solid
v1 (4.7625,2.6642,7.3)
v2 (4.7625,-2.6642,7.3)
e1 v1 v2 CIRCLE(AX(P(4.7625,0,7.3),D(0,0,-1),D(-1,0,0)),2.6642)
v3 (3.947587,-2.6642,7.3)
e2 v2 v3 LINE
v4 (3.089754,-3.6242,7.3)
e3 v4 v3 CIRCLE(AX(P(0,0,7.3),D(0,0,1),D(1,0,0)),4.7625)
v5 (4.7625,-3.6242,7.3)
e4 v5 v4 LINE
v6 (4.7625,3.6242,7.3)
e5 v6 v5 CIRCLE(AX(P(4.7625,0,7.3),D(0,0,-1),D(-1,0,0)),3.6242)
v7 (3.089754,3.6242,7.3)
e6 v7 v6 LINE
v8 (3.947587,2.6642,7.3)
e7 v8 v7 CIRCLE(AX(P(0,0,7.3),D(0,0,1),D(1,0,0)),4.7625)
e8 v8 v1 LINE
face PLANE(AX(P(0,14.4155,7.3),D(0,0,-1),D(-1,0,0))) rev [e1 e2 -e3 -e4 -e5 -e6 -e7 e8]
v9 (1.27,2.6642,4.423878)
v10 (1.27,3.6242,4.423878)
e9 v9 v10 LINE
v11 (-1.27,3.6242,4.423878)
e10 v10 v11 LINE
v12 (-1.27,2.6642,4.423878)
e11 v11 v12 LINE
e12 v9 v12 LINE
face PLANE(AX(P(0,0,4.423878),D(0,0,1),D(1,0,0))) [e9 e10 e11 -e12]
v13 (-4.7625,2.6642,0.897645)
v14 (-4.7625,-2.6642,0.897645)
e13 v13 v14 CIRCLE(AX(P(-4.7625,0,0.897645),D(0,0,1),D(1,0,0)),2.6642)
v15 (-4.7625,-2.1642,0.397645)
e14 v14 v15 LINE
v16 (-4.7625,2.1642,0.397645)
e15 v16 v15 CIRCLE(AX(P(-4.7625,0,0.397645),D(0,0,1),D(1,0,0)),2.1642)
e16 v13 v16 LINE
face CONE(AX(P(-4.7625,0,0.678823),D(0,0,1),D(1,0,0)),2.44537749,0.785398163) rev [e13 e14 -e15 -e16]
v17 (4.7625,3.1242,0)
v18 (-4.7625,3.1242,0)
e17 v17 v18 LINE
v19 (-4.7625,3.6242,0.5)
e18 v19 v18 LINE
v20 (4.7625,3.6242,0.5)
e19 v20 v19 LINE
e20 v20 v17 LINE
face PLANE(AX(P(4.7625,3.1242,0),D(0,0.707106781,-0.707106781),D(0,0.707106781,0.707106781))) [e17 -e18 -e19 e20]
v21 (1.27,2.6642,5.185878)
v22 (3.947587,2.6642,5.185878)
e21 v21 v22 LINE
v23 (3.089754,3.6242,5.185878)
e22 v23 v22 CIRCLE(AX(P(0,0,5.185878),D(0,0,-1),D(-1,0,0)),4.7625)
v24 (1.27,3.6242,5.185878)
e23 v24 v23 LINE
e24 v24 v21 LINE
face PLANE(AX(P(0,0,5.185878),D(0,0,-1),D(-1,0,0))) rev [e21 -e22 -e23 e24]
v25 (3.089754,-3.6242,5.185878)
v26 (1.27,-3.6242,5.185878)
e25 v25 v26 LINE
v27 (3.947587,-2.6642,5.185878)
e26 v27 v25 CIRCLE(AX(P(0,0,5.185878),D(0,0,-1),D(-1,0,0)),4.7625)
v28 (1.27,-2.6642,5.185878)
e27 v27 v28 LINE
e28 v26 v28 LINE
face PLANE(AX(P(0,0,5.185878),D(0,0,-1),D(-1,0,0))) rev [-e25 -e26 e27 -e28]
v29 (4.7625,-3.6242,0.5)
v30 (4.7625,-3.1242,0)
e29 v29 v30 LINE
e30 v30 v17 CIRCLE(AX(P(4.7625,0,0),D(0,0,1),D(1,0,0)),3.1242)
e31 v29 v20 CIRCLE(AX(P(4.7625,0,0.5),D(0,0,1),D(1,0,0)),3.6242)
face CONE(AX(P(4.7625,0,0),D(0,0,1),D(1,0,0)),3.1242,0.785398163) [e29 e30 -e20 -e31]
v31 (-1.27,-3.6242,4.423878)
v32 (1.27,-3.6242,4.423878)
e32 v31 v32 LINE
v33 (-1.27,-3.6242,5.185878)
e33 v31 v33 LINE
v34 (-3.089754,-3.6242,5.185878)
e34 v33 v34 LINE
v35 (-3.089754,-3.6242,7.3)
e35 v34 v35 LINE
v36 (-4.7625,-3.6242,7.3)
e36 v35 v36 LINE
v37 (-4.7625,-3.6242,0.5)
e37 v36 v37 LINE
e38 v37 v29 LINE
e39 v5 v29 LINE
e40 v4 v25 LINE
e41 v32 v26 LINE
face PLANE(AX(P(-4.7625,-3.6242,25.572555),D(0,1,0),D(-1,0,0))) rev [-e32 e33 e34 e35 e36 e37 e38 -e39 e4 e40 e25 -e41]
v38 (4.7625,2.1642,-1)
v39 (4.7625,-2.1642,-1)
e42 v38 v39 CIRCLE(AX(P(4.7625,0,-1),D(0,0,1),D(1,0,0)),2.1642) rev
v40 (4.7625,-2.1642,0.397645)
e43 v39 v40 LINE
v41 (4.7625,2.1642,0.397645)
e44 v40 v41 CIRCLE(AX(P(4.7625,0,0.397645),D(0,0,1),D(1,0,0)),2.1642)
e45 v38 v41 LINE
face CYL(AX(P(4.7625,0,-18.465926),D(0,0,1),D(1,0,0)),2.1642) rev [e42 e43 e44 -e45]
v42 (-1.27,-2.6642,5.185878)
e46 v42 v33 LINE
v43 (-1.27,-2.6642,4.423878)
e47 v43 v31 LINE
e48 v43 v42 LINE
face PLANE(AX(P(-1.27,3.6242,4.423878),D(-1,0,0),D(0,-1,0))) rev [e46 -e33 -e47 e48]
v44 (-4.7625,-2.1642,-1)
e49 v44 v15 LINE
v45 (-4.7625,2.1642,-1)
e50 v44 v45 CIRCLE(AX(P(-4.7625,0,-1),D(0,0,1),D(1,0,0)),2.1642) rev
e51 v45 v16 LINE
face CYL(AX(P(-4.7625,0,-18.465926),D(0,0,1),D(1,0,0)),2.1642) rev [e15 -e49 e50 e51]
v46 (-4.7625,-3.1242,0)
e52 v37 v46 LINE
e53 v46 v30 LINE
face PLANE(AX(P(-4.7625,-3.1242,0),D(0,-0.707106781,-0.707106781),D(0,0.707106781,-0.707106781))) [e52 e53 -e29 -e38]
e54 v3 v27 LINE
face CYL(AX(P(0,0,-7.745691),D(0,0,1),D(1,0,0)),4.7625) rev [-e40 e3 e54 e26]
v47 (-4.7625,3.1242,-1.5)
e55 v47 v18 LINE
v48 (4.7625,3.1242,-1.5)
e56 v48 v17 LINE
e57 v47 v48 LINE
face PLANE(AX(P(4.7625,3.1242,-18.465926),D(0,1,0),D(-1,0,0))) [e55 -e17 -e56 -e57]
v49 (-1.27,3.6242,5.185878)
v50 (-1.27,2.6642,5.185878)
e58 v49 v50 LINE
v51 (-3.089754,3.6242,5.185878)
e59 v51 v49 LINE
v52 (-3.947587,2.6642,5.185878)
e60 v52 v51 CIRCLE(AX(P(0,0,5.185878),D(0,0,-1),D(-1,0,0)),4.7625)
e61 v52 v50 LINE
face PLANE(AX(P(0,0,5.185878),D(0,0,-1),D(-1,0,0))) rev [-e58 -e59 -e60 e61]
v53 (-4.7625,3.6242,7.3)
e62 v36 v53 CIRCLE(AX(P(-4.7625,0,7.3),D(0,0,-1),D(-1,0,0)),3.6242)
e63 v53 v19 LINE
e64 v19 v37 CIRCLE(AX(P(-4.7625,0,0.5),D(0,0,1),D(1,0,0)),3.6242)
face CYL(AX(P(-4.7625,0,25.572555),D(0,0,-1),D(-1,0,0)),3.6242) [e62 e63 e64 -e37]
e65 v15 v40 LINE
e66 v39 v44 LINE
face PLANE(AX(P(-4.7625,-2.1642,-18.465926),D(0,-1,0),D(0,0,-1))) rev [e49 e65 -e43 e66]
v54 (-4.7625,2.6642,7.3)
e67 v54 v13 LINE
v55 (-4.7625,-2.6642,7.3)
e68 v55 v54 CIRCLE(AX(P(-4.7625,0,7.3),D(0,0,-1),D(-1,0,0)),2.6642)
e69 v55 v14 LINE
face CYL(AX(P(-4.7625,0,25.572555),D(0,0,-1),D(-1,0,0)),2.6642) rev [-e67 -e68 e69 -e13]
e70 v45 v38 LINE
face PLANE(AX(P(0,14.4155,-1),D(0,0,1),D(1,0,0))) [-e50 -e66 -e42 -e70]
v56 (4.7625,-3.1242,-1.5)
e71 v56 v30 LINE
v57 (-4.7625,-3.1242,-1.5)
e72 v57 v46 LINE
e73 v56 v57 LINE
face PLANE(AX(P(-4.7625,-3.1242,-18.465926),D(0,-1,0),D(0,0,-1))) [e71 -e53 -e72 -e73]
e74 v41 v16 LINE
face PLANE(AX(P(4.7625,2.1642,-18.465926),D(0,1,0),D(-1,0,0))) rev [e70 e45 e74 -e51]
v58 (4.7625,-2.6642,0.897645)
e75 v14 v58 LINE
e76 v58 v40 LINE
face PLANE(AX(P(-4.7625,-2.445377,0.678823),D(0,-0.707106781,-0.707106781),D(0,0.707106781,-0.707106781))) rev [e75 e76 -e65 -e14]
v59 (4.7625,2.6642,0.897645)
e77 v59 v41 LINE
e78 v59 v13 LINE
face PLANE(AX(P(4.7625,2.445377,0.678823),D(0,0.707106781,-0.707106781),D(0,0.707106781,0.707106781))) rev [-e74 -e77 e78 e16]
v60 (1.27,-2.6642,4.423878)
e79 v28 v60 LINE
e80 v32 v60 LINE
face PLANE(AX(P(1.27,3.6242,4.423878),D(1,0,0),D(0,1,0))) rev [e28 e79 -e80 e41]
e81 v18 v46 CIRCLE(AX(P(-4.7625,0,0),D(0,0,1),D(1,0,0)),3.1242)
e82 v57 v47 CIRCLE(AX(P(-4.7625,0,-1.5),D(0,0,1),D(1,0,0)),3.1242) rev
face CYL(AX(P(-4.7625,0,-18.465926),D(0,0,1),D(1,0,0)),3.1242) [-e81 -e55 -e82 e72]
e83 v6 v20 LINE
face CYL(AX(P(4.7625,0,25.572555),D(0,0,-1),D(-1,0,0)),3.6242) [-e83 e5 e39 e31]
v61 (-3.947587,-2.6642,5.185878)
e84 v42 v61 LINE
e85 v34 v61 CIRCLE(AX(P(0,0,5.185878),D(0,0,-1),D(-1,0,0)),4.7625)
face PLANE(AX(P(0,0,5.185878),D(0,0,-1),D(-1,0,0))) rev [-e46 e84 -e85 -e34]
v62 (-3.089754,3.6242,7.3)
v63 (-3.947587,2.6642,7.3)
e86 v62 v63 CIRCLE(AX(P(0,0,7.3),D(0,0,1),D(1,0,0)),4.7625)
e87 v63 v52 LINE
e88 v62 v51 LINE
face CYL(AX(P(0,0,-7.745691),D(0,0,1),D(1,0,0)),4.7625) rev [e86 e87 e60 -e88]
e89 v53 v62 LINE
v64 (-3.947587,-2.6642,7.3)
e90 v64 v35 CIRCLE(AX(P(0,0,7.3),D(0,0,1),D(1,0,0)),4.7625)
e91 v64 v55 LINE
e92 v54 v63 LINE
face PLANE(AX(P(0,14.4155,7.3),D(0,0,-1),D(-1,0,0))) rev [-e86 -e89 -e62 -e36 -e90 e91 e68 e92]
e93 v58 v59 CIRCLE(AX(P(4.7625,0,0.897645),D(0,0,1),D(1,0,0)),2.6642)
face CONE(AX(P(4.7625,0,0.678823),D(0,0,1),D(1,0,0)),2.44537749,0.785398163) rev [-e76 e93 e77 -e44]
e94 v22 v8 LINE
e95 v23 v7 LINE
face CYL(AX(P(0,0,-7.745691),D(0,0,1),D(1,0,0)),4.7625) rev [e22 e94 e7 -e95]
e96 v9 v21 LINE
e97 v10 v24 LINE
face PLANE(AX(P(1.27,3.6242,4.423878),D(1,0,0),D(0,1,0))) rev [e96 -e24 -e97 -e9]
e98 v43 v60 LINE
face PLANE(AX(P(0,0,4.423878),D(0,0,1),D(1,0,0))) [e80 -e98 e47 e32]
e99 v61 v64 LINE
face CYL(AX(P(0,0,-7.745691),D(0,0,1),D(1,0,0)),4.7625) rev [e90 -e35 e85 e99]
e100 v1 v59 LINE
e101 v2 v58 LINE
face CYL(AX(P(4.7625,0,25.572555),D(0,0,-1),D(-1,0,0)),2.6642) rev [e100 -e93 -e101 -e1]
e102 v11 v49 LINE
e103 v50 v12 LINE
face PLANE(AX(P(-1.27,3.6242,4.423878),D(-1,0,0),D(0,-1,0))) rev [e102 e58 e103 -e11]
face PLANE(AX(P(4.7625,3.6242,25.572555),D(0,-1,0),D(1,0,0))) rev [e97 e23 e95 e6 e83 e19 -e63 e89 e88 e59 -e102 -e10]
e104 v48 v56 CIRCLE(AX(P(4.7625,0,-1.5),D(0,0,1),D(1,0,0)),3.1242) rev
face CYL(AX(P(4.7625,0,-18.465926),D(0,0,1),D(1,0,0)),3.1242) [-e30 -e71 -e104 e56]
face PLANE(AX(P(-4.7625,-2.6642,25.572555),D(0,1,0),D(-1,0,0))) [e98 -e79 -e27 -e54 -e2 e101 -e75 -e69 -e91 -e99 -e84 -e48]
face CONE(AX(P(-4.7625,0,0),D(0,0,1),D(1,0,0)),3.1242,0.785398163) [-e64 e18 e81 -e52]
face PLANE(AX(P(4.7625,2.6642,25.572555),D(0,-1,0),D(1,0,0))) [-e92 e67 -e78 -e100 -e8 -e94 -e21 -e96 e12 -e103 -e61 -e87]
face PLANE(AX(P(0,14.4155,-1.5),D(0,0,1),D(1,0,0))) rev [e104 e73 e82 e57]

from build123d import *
from OCP.BRepAlgoAPI import BRepAlgoAPI_Cut
from OCP.TopTools import TopTools_ListOfShape

# Parameters (mm, degrees)
BOSS_EXTRUDE1_DEPTH      = 1.5
BOSS_EXTRUDE3_DEPTH      = 0.5
BOSS_EXTRUDE3_DRAFT      = -45
BOSS_EXTRUDE4_DEPTH      = 6.8
SHELL1_T                 = -0.96
SHELL1_THICKNESS_2_DEPTH = 0.46
CUT_EXTRUDE1_START       = -2.114122
CUT_EXTRUDE1_DEPTH       = 2.114122
SKETCH5_W                = 2.54
SKETCH5_H                = 7.2484
CUT_EXTRUDE2_DEPTH       = 0.762


with BuildPart() as part:
    # Sketch2 → Boss-Extrude1 (new body)
    with BuildSketch(Plane.XY):
        with BuildLine():
            Line((-4.7625, -3.1242), (4.7625, -3.1242))
            ThreePointArc((4.7625, -3.1242), (7.8867, 0), (4.7625, 3.1242))
            Line((4.7625, 3.1242), (-4.7625, 3.1242))
            ThreePointArc((-4.7625, 3.1242), (-7.8867, 0), (-4.7625, -3.1242))
        make_face()
    extrude(amount=-BOSS_EXTRUDE1_DEPTH)


with BuildPart() as boss_extrude3_tool:
    # Sketch2<3> → Boss-Extrude3 (with draft: the straight prism first)
    with BuildSketch(Plane.XY):
        with BuildLine():
            Line((-4.7625, -3.1242), (4.7625, -3.1242))
            ThreePointArc((4.7625, -3.1242), (7.8867, 0), (4.7625, 3.1242))
            Line((4.7625, 3.1242), (-4.7625, 3.1242))
            ThreePointArc((-4.7625, 3.1242), (-7.8867, 0), (-4.7625, -3.1242))
        make_face()
    extrude(amount=BOSS_EXTRUDE3_DEPTH)
    # Boss-Extrude3: the draft: its side faces are tilted about the plane it starts from
    boss_extrude3_sides = [boss_extrude3_tool.faces().sort_by_distance(p)[0] for p in [
        (0, -3.1242, 0.25),
        (7.8867, 0, 0.25),
        (0, 3.1242, 0.25),
        (-7.8867, 0, 0.25),
    ]]
    draft(boss_extrude3_sides, Plane.XY, BOSS_EXTRUDE3_DRAFT)


with BuildPart() as part_1:
    add(part.part)

    # Boss-Extrude3: add boss_extrude3_tool
    add(boss_extrude3_tool.part)

    # Sketch3 → Boss-Extrude4 (add)
    with BuildSketch(Plane.XY.offset(0.5)):
        with BuildLine():
            Line((-4.7625, -3.6242), (4.7625, -3.6242))
            ThreePointArc((4.7625, -3.6242), (8.3867, 0), (4.7625, 3.6242))
            Line((4.7625, 3.6242), (-4.7625, 3.6242))
            ThreePointArc((-4.7625, 3.6242), (-8.3867, 0), (-4.7625, -3.6242))
        make_face()
    extrude(amount=BOSS_EXTRUDE4_DEPTH)

    # Shell1
    shell1_openings = [part_1.faces().sort_by_distance(p)[0] for p in [
        (0, 0, 7.3),
    ]]
    offset(amount=SHELL1_T, openings=shell1_openings, kind=Kind.INTERSECTION)

    # Shell1 thickness 2 face (on inner face of the shell) → Shell1 thickness 2 (cut)
    with BuildSketch(Plane(origin=(0, 0, -0.54), x_dir=(-1, 0, 0), z_dir=(0, 0, -1))):
        with BuildLine():
            Line((-4.7625, 2.1642), (4.7625, 2.1642))
            ThreePointArc((4.7625, 2.1642), (6.9267, 0), (4.7625, -2.1642))
            Line((4.7625, -2.1642), (-4.7625, -2.1642))
            ThreePointArc((-4.7625, -2.1642), (-6.9267, 0), (-4.7625, 2.1642))
        make_face()
    extrude(amount=SHELL1_THICKNESS_2_DEPTH, mode=Mode.SUBTRACT)

    # Sketch4 → Cut-Extrude1 (cut)
    with BuildSketch(Plane.XY.offset(7.3).offset(CUT_EXTRUDE1_START)):
        with BuildLine():
            Line((1.3335, 4.572), (-1.3335, 4.572))
            ThreePointArc((-1.3335, 4.572), (-3.367596045, 3.367596045), (-4.572, 1.3335))
            Line((-4.572, 1.3335), (-4.572, -1.3335))
            ThreePointArc((-4.572, -1.3335), (-3.367596045, -3.367596045), (-1.3335, -4.572))
            Line((-1.3335, -4.572), (1.3335, -4.572))
            ThreePointArc((1.3335, -4.572), (3.367596045, -3.367596045), (4.572, -1.3335))
            Line((4.572, -1.3335), (4.572, 1.3335))
            ThreePointArc((4.572, 1.3335), (3.367596045, 3.367596045), (1.3335, 4.572))
        make_face()
    extrude(amount=CUT_EXTRUDE1_DEPTH, mode=Mode.SUBTRACT)


with BuildPart() as cut_extrude2_tool:
    # Sketch5 → Cut-Extrude2 (new body)
    with BuildSketch(Plane.XY.offset(5.185877531)):
        Rectangle(SKETCH5_W, SKETCH5_H)
    extrude(amount=-CUT_EXTRUDE2_DEPTH)


with BuildPart() as part_2:
    add(part_1.part)

    # Cut-Extrude2: cut by cut_extrude2_tool, with a tolerance
    cut_extrude2_stock = TopTools_ListOfShape()
    cut_extrude2_stock.Append(part_2.part.wrapped)
    cut_extrude2_tools = TopTools_ListOfShape()
    cut_extrude2_tools.Append(cut_extrude2_tool.part.wrapped)
    cut_extrude2_cut = BRepAlgoAPI_Cut()
    cut_extrude2_cut.SetArguments(cut_extrude2_stock)
    cut_extrude2_cut.SetTools(cut_extrude2_tools)
    cut_extrude2_cut.SetFuzzyValue(0.00001)
    cut_extrude2_cut.Build()
    add(Compound.cast(cut_extrude2_cut.Shape()).solids(), mode=Mode.REPLACE)


solid = part_2.part
